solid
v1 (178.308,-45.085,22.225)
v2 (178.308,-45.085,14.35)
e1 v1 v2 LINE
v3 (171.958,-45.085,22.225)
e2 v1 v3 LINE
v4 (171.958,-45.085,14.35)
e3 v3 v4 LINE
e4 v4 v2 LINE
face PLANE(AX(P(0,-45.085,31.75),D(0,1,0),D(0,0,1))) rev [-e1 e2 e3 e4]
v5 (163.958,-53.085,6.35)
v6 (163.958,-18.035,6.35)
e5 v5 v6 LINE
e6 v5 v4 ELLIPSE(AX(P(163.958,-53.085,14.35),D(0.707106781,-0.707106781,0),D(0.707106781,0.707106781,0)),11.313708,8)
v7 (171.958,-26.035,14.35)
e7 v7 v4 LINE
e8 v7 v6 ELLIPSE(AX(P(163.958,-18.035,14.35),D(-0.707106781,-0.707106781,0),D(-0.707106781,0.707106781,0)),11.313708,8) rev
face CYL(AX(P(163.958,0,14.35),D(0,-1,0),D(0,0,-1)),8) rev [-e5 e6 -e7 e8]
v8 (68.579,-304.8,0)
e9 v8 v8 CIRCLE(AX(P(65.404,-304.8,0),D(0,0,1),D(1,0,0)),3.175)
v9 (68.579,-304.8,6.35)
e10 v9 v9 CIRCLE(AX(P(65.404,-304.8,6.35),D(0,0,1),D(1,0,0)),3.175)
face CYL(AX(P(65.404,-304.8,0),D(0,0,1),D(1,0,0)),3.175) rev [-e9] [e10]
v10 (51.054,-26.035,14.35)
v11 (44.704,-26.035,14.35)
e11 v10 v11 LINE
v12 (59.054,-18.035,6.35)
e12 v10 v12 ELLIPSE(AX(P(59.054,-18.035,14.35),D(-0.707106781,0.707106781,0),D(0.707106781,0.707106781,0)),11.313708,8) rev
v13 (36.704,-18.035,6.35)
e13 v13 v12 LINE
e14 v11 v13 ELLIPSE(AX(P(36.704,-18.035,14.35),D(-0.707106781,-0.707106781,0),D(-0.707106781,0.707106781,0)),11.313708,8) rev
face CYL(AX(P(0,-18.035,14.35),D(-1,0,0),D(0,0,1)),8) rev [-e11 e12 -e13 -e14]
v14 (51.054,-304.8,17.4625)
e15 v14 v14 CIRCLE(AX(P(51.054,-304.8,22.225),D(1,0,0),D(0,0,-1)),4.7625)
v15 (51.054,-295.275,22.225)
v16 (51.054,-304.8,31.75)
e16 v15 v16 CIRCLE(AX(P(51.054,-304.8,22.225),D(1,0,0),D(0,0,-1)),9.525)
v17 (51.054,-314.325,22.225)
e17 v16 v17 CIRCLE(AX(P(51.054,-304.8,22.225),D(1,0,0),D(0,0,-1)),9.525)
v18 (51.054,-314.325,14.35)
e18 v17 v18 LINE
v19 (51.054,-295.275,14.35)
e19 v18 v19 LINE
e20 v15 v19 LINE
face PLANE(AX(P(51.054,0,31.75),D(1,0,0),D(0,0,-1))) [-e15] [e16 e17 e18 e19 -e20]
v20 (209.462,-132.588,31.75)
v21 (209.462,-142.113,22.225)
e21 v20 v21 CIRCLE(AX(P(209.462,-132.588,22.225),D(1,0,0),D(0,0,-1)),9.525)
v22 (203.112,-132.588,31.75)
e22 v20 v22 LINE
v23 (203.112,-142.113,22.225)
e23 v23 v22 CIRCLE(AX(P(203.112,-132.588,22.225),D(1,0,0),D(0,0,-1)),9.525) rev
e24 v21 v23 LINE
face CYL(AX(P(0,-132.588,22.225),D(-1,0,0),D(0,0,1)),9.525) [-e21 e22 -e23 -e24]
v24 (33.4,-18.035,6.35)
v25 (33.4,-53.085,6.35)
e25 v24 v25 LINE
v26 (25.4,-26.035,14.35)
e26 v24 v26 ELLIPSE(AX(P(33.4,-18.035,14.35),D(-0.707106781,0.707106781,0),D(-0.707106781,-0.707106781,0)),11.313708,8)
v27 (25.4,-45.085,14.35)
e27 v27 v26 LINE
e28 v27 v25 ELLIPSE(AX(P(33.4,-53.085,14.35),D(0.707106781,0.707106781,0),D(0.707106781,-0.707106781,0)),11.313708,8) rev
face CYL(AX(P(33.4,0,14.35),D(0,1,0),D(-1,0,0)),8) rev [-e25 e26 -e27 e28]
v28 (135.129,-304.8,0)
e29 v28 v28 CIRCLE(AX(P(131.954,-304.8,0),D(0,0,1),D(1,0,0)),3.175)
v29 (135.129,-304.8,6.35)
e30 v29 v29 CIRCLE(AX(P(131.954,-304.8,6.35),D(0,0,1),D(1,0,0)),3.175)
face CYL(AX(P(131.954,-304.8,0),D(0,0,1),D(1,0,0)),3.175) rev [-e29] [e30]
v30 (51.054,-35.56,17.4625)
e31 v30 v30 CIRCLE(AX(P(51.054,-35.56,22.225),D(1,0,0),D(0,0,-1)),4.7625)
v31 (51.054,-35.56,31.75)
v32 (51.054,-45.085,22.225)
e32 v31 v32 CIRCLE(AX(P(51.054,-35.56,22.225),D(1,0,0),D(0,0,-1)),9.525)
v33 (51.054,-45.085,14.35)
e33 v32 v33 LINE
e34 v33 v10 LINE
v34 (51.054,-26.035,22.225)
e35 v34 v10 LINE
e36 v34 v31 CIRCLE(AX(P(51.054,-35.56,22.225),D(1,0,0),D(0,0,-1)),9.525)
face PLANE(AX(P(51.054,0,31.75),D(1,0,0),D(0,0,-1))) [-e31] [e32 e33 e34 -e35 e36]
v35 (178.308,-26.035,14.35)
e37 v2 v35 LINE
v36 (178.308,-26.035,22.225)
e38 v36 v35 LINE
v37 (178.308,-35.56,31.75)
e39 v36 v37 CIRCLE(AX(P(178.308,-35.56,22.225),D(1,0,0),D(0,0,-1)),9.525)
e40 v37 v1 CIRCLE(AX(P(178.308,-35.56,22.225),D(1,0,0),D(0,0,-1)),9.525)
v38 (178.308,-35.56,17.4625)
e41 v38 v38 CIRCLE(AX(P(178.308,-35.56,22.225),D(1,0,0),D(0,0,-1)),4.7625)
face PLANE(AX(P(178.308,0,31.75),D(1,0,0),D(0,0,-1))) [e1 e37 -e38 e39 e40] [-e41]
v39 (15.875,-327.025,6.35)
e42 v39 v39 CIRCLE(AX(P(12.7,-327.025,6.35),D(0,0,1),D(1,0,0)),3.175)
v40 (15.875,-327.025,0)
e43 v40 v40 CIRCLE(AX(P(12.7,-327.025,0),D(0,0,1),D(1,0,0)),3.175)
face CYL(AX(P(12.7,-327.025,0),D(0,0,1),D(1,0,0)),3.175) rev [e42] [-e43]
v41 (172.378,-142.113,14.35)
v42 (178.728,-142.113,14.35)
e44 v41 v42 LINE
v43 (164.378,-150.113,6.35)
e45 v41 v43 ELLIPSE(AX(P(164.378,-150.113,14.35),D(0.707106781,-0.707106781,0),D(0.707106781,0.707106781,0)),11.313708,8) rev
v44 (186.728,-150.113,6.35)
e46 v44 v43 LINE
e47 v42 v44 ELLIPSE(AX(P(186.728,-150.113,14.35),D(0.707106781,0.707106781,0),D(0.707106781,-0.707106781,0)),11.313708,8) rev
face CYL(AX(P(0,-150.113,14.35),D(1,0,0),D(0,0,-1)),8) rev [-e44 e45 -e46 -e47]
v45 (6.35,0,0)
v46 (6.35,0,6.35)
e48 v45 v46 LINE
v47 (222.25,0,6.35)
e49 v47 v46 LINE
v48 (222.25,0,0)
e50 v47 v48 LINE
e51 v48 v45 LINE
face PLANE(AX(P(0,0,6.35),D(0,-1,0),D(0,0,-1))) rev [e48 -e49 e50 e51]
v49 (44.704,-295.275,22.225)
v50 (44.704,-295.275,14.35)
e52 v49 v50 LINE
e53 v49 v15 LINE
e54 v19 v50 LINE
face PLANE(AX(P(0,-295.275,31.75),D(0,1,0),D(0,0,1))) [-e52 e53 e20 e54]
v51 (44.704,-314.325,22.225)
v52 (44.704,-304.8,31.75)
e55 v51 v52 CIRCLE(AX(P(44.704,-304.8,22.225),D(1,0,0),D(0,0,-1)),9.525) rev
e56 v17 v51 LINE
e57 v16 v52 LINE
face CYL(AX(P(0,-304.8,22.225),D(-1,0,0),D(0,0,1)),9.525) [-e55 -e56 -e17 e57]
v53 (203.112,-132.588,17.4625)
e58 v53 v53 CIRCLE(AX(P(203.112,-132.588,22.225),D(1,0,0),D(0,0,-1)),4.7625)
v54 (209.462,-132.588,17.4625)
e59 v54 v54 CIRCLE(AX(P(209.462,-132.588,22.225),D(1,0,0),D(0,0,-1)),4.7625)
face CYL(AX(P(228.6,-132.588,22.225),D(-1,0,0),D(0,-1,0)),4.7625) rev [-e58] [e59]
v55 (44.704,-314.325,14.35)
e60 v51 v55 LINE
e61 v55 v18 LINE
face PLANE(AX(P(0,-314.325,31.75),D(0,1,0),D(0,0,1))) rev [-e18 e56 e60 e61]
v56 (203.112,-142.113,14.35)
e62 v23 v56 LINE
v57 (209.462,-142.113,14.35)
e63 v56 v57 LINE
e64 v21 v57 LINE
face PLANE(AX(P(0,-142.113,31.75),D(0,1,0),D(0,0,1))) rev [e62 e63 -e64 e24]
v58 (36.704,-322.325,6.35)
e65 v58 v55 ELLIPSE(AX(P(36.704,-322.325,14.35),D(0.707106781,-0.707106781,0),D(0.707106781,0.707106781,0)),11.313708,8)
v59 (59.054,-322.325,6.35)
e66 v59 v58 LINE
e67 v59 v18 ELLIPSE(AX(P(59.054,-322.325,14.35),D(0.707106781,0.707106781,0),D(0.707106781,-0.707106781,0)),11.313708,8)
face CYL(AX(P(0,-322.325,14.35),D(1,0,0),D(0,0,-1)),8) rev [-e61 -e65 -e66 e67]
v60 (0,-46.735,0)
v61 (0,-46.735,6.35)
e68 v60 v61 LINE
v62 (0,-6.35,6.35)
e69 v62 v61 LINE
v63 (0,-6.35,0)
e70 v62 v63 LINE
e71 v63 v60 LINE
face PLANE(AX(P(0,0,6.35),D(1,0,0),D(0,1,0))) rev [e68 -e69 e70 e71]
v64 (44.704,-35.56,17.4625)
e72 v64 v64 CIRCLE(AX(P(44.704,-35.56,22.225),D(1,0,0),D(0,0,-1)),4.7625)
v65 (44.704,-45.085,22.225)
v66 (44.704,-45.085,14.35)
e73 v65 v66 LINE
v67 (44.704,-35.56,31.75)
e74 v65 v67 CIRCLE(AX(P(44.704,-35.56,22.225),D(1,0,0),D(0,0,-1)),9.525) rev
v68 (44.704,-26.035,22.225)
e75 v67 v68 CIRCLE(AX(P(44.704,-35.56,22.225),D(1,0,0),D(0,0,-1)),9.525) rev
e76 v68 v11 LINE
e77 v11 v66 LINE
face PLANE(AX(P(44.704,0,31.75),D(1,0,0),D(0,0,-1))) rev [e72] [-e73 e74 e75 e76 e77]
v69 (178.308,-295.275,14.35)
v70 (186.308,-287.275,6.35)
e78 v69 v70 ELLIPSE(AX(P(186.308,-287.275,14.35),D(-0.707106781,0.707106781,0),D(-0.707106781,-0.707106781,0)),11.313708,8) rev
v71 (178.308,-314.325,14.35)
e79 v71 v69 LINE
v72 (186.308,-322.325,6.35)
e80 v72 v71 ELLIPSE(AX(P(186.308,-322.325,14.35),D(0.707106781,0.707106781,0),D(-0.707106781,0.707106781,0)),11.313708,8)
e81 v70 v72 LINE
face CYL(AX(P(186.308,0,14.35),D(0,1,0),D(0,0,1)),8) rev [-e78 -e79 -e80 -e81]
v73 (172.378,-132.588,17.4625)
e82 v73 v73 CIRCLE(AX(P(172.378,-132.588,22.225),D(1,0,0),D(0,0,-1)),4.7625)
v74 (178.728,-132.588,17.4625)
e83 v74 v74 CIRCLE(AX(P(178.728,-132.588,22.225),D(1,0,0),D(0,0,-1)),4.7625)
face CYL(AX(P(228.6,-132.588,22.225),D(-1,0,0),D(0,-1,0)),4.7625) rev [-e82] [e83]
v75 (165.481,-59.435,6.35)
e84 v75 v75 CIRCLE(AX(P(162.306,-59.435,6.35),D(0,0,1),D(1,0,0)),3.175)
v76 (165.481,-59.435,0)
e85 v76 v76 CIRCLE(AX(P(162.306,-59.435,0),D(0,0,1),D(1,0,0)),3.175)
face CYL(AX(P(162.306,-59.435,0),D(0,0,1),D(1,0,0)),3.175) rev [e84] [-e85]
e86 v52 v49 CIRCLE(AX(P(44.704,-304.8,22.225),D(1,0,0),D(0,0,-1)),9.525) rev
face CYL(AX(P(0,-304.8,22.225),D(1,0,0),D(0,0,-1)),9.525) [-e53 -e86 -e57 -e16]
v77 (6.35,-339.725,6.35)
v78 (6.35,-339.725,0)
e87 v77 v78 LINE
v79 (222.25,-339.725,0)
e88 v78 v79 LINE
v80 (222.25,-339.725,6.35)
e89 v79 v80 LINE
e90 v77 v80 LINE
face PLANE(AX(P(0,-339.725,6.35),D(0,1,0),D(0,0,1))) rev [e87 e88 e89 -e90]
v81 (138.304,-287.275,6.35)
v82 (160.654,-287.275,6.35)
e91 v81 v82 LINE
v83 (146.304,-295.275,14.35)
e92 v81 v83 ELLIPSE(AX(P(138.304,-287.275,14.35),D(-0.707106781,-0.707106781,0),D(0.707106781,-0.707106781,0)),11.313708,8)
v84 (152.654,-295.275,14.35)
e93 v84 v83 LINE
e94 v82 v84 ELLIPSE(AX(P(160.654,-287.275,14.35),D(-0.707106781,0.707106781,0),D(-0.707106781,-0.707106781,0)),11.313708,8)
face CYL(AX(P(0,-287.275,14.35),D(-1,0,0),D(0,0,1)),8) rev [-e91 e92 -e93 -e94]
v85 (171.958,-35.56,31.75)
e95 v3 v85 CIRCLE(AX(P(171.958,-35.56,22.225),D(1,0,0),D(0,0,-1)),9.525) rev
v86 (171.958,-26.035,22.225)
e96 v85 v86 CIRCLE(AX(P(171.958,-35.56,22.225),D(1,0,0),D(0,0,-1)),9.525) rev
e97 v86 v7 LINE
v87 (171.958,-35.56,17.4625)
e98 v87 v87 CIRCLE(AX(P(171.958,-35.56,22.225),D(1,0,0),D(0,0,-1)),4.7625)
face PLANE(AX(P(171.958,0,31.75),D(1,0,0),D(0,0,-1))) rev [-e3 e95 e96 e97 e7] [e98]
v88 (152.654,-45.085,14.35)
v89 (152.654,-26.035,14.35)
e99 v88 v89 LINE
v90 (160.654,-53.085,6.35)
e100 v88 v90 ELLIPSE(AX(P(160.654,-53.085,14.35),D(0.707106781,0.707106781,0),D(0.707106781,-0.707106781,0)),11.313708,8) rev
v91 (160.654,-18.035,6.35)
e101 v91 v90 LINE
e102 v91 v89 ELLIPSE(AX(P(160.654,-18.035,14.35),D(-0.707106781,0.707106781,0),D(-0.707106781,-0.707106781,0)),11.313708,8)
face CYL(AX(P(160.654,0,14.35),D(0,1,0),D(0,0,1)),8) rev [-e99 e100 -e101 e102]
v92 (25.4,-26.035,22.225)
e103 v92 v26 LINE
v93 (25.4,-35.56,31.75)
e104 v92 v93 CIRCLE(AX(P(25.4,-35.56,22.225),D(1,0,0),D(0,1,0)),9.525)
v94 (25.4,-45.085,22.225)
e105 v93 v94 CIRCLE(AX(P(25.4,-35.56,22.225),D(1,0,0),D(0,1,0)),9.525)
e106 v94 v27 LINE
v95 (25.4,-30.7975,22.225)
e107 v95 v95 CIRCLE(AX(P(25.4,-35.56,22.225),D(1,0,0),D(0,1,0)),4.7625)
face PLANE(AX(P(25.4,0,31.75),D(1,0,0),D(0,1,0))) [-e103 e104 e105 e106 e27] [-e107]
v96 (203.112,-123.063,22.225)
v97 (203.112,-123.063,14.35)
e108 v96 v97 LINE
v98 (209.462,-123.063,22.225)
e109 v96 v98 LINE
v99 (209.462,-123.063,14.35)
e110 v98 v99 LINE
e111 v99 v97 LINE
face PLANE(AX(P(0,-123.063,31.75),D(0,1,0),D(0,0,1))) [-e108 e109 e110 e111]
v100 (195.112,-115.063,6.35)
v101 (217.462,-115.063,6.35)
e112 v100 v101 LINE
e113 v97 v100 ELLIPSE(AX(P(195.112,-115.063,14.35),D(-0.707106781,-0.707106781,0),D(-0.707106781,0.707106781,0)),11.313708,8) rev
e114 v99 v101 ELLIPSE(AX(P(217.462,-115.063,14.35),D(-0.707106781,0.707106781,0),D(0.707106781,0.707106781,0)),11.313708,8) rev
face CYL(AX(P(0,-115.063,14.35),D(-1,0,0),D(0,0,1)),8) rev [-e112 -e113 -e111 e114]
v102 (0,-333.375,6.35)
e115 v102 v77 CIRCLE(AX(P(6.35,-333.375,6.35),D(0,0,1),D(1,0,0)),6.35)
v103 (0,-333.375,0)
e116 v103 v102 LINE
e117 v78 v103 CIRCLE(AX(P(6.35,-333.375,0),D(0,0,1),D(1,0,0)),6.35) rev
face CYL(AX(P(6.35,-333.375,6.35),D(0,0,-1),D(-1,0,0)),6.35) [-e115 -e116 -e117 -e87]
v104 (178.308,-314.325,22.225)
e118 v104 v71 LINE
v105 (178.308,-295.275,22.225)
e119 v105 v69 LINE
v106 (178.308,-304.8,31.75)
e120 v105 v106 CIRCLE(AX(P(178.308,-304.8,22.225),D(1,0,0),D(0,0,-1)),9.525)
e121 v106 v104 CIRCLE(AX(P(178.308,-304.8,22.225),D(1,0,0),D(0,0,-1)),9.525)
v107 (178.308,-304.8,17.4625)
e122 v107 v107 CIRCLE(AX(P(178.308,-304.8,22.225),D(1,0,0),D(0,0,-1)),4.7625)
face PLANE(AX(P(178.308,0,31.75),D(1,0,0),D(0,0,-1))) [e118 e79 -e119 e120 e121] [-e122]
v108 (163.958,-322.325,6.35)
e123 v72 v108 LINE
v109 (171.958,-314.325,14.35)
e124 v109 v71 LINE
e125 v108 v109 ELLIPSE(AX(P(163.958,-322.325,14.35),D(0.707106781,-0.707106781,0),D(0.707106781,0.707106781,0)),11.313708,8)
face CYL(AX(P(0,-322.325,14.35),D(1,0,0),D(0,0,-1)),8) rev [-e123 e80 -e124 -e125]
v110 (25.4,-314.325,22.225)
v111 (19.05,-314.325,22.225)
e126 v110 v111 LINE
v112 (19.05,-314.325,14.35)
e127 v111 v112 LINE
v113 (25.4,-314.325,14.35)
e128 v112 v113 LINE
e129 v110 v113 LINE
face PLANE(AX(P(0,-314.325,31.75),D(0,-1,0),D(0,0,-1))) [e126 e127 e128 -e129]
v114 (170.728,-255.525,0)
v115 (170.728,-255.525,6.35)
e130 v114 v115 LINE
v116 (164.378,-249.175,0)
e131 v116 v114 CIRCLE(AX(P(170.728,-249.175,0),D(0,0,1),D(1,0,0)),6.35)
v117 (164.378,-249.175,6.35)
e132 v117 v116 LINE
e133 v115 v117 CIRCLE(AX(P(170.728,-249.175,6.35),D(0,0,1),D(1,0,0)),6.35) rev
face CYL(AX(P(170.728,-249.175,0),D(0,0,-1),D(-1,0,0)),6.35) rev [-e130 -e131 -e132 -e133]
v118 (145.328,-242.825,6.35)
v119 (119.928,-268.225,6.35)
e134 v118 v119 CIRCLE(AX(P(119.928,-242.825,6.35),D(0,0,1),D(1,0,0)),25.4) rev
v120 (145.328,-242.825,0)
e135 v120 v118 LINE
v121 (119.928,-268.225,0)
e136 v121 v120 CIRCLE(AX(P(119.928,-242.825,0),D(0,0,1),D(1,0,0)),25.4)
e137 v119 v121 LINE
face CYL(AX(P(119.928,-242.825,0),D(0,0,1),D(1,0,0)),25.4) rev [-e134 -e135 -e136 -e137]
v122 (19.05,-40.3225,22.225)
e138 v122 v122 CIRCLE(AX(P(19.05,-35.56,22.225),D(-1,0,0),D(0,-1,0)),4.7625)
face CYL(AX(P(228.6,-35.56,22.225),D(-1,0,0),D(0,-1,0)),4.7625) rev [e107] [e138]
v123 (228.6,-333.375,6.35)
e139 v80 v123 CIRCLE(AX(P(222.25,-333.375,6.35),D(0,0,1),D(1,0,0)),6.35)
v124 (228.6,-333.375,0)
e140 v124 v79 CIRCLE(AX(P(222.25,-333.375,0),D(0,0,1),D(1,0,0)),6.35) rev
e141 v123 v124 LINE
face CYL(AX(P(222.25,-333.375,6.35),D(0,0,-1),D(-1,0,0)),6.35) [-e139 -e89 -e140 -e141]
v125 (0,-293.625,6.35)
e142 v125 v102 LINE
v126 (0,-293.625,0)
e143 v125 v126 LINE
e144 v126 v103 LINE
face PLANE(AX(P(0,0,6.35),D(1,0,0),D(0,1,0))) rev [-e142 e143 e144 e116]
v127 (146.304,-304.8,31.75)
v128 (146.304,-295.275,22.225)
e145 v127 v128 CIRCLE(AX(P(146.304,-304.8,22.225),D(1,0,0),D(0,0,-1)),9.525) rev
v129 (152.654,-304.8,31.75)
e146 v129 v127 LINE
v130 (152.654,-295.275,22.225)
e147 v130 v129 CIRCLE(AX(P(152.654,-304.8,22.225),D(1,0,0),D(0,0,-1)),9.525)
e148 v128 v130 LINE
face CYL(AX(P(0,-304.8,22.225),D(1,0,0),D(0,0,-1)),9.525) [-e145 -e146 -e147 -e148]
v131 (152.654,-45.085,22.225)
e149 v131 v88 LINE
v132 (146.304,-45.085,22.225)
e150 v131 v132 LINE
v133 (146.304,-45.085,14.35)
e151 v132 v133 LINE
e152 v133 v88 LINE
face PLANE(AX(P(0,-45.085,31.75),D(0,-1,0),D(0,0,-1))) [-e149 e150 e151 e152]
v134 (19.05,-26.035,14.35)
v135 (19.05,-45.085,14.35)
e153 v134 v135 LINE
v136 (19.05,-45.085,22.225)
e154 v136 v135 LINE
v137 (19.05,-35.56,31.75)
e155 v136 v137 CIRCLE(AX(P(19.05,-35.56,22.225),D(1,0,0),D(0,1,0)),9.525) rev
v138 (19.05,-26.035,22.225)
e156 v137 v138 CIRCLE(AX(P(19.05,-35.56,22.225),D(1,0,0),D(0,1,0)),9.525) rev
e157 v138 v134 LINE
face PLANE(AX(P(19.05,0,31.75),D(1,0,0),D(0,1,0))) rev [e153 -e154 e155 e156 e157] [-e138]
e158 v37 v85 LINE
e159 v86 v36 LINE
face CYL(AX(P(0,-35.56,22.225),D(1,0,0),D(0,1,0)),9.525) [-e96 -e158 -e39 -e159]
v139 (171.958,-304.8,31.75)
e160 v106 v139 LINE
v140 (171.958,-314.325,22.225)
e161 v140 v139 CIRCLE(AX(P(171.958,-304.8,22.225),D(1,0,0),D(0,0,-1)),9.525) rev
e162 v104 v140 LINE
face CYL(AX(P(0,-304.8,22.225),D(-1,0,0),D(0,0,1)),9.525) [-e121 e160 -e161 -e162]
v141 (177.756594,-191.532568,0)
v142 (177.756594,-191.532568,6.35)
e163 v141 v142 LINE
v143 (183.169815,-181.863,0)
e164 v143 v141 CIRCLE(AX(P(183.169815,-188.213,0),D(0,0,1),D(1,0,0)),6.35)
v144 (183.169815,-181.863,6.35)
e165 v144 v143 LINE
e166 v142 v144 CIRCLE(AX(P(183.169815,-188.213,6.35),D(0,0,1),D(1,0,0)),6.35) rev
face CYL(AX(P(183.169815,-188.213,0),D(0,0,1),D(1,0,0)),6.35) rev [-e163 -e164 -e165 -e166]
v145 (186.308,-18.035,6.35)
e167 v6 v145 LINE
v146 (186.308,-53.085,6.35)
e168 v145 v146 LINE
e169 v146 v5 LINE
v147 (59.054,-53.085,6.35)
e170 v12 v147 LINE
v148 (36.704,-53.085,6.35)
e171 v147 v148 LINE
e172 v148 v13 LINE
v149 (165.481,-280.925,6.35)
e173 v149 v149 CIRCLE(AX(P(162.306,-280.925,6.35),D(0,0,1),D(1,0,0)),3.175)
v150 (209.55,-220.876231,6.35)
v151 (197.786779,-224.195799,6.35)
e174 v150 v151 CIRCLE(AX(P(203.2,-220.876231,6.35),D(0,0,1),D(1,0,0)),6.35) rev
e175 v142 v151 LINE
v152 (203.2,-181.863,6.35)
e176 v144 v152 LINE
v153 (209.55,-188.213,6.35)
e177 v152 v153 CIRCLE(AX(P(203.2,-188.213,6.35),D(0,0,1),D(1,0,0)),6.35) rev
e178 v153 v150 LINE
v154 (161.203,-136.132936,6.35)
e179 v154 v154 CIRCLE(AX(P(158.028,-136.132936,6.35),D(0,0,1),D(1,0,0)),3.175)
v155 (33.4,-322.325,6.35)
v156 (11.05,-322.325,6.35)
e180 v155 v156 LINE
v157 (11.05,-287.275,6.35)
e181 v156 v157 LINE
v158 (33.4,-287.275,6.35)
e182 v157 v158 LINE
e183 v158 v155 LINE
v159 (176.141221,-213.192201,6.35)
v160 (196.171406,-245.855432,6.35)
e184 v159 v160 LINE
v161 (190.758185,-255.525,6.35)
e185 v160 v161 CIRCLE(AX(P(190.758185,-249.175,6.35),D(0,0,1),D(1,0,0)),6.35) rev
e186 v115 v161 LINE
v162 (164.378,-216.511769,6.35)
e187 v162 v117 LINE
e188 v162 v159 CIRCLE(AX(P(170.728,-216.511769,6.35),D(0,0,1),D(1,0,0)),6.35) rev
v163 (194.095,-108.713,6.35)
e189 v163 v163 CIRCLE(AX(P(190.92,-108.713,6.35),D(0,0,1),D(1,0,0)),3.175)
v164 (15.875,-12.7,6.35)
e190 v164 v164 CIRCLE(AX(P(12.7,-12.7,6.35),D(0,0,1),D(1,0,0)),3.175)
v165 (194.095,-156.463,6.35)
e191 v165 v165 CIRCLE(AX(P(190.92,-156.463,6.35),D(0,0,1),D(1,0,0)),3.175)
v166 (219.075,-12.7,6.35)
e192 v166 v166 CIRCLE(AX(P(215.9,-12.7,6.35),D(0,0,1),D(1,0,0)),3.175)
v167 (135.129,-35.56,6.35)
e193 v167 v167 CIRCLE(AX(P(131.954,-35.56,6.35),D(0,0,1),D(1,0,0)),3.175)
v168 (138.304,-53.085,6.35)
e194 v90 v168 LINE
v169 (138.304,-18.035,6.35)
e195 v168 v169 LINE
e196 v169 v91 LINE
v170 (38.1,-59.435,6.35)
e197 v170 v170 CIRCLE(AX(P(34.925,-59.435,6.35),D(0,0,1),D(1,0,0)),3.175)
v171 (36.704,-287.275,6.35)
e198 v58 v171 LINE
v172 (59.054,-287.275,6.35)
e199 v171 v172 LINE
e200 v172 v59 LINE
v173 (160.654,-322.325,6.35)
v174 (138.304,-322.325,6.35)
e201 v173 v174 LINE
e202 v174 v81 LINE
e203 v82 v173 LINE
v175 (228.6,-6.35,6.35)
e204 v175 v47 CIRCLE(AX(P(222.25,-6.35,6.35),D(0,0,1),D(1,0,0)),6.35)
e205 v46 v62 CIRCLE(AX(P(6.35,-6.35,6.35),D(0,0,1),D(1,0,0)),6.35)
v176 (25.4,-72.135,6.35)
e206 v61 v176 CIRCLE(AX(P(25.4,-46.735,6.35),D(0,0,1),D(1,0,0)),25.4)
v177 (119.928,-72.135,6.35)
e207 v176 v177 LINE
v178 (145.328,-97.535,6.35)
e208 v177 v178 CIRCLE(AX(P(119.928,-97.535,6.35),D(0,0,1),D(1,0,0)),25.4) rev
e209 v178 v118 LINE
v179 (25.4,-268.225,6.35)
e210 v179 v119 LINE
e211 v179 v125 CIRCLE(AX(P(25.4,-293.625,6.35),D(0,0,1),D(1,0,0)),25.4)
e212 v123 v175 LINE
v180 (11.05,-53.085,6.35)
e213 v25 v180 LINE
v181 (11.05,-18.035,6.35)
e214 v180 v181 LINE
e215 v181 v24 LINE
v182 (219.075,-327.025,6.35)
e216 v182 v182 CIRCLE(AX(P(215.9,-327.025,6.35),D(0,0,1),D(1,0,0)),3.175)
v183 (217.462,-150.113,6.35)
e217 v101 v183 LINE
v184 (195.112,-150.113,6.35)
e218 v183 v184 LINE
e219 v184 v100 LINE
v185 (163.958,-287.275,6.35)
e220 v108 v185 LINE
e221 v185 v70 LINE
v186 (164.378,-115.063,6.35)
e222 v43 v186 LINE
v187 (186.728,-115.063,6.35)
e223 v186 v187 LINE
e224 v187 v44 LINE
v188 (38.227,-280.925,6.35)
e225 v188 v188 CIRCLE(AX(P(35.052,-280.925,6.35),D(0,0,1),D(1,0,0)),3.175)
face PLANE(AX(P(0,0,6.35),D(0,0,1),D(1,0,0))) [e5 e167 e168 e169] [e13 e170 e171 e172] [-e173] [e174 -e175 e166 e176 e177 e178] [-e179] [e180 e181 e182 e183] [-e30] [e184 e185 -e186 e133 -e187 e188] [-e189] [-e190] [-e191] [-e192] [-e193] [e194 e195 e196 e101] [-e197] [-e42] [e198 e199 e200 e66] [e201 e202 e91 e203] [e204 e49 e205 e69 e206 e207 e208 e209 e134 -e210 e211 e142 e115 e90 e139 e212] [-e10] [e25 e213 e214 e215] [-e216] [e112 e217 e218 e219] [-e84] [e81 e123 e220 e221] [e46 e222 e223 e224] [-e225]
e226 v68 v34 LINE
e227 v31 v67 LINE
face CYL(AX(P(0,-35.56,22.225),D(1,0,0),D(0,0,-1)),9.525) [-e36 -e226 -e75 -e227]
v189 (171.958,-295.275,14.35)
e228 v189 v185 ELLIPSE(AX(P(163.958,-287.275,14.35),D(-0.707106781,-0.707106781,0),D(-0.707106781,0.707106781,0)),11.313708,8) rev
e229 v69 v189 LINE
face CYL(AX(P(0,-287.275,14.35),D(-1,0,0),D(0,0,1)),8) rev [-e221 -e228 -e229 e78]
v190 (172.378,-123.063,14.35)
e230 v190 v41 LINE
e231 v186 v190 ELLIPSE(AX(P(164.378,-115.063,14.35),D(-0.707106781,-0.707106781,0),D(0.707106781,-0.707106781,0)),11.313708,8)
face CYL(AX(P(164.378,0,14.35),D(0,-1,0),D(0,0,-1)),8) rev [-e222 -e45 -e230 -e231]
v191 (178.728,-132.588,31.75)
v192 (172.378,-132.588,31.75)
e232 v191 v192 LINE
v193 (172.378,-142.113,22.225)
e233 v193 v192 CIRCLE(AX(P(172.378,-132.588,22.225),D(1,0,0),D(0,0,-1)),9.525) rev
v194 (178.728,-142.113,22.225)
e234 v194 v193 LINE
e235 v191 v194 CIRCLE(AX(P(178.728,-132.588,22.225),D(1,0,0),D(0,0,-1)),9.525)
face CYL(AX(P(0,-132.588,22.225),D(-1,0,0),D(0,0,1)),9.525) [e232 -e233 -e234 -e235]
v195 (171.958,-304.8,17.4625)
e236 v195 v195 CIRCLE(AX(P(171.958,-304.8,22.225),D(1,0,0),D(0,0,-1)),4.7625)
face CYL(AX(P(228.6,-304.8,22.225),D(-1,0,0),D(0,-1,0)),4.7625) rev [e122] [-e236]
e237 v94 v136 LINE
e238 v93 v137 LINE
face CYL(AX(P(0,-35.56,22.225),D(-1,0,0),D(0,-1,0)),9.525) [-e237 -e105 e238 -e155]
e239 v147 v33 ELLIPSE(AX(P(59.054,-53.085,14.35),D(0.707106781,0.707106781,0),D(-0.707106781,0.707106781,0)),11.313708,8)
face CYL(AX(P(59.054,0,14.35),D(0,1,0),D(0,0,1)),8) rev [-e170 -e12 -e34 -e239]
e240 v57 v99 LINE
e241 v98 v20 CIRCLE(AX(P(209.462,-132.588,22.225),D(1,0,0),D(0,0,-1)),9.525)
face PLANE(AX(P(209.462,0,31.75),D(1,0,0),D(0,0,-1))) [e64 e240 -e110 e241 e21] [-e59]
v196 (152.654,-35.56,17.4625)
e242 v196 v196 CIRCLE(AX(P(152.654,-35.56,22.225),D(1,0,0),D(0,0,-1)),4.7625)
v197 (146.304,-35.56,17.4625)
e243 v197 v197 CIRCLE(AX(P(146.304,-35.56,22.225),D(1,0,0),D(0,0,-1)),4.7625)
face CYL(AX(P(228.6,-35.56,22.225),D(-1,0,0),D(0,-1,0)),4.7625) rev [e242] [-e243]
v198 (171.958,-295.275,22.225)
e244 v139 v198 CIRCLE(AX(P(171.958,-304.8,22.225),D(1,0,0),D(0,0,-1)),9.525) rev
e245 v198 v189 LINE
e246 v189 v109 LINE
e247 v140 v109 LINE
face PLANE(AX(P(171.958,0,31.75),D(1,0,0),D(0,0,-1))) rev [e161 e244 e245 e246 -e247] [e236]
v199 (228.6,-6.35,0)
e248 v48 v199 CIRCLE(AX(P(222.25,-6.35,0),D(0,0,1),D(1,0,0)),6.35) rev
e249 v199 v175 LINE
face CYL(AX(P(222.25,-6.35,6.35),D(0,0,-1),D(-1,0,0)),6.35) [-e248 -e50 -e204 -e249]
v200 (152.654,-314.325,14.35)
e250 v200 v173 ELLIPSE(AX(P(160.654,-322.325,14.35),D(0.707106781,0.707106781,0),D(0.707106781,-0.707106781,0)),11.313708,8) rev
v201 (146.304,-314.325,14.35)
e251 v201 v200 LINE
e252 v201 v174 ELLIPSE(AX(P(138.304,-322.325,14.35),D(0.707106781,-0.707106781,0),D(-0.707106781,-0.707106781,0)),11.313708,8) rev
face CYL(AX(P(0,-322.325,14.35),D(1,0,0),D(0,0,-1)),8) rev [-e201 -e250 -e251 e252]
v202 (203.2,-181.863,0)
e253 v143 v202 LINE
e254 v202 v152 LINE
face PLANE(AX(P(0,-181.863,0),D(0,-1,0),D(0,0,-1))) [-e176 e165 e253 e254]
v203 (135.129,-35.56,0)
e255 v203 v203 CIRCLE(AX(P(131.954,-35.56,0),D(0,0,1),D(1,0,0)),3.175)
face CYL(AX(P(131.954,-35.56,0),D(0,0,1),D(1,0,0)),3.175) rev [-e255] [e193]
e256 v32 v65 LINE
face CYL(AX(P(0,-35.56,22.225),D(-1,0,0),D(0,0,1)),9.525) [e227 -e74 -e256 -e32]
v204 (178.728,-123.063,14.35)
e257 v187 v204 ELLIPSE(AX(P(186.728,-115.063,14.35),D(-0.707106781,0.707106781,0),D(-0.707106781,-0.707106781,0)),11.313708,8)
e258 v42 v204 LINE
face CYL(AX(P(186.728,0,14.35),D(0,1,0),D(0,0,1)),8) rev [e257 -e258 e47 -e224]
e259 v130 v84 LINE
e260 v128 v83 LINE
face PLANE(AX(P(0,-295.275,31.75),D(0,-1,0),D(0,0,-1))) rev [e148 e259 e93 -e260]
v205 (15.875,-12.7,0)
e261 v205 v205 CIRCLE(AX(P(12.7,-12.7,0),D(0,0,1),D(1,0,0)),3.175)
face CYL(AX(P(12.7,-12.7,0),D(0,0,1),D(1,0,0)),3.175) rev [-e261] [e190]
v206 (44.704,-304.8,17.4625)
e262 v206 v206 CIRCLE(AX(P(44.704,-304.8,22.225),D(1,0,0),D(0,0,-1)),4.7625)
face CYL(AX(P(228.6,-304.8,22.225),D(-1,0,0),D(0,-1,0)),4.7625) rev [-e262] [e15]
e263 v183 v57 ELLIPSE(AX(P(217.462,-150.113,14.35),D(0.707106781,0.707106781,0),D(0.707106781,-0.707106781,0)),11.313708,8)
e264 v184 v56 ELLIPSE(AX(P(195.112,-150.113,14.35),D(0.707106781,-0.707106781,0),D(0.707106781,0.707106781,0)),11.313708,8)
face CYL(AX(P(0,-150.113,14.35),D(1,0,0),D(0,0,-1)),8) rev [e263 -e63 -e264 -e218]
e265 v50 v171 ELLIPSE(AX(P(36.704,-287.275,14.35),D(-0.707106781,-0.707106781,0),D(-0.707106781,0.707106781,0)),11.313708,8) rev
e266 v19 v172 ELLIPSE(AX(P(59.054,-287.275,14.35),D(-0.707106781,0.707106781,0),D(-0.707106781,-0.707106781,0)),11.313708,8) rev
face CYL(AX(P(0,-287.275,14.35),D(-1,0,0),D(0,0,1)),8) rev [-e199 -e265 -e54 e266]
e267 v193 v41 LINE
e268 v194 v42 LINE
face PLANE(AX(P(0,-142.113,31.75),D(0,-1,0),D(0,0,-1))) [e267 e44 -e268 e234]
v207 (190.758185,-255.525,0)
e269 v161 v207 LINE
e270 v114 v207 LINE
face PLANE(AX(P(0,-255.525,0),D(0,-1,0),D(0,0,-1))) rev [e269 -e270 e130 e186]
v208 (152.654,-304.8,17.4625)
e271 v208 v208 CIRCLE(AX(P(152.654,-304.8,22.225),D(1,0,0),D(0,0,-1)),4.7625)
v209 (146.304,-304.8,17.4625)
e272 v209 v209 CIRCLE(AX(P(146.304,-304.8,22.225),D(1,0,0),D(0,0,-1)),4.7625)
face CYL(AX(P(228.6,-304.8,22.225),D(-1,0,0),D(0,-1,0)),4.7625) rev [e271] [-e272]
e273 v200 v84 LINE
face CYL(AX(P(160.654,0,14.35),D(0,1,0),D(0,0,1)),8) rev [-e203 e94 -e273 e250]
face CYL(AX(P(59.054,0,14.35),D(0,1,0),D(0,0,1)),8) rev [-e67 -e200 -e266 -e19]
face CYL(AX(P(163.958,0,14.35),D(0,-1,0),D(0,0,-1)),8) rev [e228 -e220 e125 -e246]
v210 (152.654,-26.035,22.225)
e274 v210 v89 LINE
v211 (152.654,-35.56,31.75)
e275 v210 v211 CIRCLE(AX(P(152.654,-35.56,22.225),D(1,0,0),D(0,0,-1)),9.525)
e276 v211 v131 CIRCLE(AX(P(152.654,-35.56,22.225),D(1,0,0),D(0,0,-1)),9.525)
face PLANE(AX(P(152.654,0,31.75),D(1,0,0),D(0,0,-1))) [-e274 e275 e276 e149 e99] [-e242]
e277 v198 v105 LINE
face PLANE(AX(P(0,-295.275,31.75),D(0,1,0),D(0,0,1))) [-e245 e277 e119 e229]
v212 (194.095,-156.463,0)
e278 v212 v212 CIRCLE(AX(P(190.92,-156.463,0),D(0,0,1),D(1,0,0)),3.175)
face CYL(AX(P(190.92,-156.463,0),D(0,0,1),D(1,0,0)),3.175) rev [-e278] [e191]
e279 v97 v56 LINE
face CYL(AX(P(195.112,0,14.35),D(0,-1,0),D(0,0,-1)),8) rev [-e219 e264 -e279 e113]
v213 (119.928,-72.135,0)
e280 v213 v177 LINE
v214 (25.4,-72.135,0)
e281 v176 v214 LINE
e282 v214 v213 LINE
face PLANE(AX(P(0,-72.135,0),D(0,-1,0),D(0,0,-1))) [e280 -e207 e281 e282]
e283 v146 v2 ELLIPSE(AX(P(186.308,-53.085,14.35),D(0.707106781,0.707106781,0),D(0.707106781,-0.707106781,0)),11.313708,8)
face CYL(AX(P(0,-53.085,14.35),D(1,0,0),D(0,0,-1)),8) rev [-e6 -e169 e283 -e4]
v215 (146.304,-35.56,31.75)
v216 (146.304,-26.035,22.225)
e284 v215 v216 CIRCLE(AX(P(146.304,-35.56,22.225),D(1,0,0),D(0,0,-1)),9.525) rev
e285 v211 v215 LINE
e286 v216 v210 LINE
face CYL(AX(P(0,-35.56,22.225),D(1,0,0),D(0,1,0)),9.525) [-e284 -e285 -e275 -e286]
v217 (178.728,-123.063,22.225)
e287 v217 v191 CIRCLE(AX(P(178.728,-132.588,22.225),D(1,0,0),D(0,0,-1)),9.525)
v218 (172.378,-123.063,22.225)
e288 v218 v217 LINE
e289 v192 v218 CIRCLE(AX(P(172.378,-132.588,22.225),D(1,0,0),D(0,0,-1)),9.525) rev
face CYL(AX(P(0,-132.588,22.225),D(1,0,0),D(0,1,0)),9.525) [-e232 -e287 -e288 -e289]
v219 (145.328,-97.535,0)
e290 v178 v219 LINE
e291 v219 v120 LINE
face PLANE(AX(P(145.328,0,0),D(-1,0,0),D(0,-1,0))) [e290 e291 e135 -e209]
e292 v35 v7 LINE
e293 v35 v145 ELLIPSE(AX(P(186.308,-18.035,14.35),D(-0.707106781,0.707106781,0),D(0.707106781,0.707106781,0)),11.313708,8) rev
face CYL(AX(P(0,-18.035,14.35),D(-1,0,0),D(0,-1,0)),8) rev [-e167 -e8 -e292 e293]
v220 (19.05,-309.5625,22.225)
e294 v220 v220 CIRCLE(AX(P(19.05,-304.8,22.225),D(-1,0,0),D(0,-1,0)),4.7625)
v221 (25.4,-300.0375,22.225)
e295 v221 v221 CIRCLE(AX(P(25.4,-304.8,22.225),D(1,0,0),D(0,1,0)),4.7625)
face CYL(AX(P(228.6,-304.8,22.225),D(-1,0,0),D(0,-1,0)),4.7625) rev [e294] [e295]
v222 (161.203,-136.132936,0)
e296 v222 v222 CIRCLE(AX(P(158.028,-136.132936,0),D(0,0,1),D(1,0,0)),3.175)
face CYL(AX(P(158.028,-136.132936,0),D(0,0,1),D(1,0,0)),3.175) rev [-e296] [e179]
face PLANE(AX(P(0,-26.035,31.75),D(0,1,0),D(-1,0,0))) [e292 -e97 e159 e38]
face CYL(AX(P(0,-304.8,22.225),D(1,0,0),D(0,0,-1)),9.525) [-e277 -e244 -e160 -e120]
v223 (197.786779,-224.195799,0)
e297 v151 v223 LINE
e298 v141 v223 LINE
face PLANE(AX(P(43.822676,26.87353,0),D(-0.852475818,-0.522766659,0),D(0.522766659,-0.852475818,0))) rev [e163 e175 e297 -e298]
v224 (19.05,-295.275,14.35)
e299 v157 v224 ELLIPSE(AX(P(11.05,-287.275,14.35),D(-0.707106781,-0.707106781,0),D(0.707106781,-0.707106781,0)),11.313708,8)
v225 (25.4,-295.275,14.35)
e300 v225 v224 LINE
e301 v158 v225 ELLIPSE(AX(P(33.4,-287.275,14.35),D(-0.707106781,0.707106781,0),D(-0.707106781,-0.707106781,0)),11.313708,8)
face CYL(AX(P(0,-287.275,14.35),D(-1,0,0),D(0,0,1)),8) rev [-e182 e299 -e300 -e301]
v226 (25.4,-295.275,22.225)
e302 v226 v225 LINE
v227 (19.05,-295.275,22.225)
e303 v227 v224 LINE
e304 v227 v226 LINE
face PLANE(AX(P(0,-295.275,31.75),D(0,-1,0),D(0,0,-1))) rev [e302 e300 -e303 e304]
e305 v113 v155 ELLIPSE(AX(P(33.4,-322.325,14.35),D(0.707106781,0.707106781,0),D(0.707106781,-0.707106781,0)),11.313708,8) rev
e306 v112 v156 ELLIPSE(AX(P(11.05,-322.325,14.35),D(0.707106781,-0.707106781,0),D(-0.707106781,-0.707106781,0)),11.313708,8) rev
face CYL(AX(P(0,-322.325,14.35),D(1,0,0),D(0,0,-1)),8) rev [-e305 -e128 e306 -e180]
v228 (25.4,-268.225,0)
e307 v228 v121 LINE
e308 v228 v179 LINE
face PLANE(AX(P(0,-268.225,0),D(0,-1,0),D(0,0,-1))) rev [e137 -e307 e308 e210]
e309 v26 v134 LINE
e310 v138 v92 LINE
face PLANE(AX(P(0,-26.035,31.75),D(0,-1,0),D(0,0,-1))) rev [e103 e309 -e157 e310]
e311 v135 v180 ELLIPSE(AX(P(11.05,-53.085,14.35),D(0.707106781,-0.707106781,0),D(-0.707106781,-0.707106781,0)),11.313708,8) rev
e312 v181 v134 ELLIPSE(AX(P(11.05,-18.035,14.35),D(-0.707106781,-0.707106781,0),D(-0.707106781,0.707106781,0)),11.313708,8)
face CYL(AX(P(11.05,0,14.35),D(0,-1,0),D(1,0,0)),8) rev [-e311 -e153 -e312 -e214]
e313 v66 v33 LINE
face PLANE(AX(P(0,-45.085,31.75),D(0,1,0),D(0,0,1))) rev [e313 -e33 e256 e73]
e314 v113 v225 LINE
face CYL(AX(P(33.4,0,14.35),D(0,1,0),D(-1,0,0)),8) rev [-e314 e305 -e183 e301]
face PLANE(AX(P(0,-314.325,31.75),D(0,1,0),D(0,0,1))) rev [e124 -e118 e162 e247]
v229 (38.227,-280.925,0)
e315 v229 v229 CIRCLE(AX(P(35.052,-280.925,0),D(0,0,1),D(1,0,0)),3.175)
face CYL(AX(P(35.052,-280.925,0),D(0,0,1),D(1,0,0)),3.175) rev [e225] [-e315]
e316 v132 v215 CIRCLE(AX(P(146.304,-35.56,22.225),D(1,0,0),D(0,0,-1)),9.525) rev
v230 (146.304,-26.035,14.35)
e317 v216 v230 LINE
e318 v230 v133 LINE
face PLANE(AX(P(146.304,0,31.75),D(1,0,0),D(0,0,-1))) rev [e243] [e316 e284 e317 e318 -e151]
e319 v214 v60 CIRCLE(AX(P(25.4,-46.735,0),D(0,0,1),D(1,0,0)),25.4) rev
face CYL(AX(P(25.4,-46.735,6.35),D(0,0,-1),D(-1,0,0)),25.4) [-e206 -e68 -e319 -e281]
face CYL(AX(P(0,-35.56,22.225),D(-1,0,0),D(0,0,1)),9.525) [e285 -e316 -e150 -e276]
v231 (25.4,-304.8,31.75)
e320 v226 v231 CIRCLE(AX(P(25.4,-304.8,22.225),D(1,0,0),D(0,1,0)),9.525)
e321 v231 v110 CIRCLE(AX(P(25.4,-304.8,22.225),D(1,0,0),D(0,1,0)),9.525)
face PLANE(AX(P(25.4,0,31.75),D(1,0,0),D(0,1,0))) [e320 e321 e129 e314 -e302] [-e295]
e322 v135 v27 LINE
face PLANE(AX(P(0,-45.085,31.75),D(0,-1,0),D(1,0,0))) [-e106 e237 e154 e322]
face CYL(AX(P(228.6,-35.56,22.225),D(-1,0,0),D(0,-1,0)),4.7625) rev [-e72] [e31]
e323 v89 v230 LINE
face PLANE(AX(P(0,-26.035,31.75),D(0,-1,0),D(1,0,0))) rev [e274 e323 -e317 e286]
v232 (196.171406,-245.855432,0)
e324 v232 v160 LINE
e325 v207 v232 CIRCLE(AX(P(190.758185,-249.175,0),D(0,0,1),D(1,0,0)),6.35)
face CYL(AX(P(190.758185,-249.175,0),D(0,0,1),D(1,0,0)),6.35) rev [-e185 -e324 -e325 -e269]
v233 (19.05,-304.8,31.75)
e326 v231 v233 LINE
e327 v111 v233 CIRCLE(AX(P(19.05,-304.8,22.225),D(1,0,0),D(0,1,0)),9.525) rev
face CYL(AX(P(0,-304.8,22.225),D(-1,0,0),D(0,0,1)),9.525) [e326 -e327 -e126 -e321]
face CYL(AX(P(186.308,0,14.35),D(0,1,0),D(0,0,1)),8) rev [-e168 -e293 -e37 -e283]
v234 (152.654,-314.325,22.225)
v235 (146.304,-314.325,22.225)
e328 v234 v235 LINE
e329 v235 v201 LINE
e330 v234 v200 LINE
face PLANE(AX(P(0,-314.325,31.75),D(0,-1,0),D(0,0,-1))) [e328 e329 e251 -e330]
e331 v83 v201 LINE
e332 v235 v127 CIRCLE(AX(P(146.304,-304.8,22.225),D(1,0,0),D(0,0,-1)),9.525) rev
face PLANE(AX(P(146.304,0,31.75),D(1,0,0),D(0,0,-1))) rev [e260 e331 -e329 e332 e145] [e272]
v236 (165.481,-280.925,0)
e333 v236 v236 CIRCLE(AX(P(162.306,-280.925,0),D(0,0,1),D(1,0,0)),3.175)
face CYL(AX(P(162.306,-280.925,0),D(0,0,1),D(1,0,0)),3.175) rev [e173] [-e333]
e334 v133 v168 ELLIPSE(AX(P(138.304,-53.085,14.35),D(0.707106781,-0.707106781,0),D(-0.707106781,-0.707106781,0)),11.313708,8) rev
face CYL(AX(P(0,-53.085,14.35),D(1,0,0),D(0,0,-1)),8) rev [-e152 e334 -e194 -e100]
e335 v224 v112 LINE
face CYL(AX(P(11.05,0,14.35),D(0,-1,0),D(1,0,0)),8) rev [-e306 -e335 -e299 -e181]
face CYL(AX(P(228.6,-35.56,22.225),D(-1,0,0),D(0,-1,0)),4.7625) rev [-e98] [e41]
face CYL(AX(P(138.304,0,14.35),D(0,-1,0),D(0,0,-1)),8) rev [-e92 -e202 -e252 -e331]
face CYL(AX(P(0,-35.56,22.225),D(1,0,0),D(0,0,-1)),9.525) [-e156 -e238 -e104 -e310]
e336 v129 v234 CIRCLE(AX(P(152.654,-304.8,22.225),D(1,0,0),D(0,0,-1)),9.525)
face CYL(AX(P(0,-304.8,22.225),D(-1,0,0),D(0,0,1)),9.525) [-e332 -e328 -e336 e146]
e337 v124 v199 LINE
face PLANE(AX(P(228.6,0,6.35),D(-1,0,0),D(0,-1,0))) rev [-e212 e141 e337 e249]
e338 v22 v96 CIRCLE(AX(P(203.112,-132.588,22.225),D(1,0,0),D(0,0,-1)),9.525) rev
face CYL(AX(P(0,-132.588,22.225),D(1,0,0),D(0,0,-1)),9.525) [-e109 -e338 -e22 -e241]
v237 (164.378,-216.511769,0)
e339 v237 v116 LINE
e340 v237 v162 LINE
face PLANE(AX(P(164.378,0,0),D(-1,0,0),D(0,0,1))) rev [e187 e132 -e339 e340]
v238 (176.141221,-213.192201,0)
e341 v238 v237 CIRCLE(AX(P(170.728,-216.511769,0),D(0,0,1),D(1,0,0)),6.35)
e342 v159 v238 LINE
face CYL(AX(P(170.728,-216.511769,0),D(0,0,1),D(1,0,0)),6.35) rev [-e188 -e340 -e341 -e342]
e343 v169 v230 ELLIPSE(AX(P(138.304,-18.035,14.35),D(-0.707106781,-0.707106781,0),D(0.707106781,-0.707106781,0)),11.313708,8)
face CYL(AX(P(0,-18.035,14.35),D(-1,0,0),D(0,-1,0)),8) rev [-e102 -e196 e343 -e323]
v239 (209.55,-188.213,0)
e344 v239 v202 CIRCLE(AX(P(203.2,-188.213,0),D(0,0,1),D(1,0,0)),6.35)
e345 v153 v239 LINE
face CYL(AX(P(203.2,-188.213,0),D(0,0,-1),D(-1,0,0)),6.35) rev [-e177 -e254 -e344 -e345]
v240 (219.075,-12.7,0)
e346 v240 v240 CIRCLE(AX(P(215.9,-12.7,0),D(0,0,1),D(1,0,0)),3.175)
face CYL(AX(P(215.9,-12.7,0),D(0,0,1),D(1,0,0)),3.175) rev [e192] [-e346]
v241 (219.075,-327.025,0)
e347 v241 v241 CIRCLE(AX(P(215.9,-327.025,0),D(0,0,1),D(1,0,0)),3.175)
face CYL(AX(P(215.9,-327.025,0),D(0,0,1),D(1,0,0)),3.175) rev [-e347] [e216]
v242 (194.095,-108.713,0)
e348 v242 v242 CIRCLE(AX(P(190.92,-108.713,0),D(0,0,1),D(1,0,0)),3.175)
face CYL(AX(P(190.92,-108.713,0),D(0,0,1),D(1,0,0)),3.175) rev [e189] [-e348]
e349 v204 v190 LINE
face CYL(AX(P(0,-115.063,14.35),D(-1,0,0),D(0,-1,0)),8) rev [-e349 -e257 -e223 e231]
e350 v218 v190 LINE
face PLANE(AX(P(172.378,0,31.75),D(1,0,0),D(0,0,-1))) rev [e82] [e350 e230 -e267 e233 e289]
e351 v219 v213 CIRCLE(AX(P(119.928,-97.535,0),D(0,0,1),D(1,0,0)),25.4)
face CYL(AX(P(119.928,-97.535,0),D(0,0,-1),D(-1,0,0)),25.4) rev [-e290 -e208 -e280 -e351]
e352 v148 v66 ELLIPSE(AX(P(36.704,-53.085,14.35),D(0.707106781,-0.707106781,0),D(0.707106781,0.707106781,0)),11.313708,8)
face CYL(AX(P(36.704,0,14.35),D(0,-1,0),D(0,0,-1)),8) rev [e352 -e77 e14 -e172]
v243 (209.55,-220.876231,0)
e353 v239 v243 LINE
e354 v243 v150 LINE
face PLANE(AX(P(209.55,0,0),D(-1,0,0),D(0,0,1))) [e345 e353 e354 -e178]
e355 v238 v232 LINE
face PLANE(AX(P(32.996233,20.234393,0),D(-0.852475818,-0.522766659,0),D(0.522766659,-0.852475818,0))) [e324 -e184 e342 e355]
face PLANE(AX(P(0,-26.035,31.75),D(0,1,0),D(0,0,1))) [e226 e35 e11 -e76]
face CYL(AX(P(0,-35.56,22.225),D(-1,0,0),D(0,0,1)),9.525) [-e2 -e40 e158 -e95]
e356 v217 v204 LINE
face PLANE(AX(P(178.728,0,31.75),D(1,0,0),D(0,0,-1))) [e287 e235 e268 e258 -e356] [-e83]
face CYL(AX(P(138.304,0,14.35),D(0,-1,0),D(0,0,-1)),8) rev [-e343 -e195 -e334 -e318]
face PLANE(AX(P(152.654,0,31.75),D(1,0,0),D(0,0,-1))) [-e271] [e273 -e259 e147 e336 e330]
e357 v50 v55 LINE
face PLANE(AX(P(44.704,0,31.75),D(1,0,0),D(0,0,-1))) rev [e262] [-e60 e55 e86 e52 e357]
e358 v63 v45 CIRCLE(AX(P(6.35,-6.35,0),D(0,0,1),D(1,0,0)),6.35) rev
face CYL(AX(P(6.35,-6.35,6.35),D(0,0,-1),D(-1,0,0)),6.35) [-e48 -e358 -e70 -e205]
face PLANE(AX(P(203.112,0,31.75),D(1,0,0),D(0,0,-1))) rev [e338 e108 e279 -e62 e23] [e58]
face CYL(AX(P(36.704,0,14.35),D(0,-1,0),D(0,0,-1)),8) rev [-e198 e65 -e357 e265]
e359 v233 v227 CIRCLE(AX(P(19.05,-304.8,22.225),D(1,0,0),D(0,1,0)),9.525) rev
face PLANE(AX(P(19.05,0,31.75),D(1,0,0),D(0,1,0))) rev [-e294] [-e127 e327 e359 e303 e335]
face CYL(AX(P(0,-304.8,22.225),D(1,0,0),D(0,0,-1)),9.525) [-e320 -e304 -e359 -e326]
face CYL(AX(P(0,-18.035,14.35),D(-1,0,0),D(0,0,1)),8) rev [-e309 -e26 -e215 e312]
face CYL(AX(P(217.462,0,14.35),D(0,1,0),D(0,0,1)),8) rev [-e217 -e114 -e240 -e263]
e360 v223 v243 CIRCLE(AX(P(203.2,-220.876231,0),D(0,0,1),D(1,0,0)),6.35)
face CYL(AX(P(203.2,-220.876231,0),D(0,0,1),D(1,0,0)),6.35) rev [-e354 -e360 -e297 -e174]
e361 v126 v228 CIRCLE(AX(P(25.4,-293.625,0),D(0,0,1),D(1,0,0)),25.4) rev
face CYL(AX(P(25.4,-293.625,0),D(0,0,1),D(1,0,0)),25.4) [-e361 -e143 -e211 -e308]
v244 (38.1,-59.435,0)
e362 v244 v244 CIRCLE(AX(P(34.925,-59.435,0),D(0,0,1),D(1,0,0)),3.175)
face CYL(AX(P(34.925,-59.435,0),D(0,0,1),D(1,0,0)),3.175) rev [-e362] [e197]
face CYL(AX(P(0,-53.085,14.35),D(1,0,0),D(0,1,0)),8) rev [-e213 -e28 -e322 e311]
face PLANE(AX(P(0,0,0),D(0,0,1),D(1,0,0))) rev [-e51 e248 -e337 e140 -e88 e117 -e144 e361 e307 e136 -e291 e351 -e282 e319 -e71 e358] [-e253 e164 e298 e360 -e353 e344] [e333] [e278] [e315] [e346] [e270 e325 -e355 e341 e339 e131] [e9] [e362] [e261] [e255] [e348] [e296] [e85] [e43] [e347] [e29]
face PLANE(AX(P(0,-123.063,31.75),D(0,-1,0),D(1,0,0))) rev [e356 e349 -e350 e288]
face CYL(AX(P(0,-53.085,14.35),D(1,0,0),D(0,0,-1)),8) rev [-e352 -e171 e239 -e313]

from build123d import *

# Parameters (mm, degrees)
SKETCH1_W           = 228.6
SKETCH1_H           = 339.725
BOSS_EXTRUDE1_DEPTH = 6.35
SKETCH2_W           = 6.35
SKETCH2_H           = 19.05
BOSS_EXTRUDE2_DEPTH = 25.4
FILLET1_R           = 9.525
FILLET2_R           = 8
SKETCH3_R           = 4.7625
CUT_EXTRUDE1_DEPTH  = 401.415210282
SKETCH5_R           = 3.175
CUT_EXTRUDE2_DEPTH  = 411.263568484
SKETCH9_W           = 145.328
SKETCH9_H           = 196.09
CUT_EXTRUDE3_DEPTH  = 411.263568484
FILLET3_R           = 25.4
FILLET4_R           = 6.35


with BuildPart() as part:
    # Sketch1 → Boss-Extrude1 (new body)
    with BuildSketch(Plane.XY):
        with Locations((114.3, -169.8625)):
            Rectangle(SKETCH1_W, SKETCH1_H)
    extrude(amount=BOSS_EXTRUDE1_DEPTH)

    # Sketch2 → Boss-Extrude2 (add)
    with BuildSketch(Plane.XY.offset(6.35)):
        with Locations((22.225, -35.56)):
            Rectangle(SKETCH2_W, SKETCH2_H)
        with Locations((47.879, -35.56)):
            Rectangle(SKETCH2_W, SKETCH2_H)
        with Locations((149.479, -35.56)):
            Rectangle(SKETCH2_W, SKETCH2_H)
        with Locations((175.133, -35.56)):
            Rectangle(SKETCH2_W, SKETCH2_H)
        with Locations((22.225, -304.8)):
            Rectangle(SKETCH2_W, SKETCH2_H)
        with Locations((47.879, -304.8)):
            Rectangle(SKETCH2_W, SKETCH2_H)
        with Locations((149.479, -304.8)):
            Rectangle(SKETCH2_W, SKETCH2_H)
        with Locations((175.133, -304.8)):
            Rectangle(SKETCH2_W, SKETCH2_H)
        with Locations((175.553, -132.588)):
            Rectangle(SKETCH2_W, SKETCH2_H)
        with Locations((206.287, -132.588)):
            Rectangle(SKETCH2_W, SKETCH2_H)
    extrude(amount=BOSS_EXTRUDE2_DEPTH)

    # Fillet1
    fillet1_edges = [part.edges().sort_by_distance(p)[0] for p in [
        (22.225, -314.325, 31.75),
        (22.225, -295.275, 31.75),
        (47.879, -314.325, 31.75),
        (47.879, -295.275, 31.75),
        (149.479, -314.325, 31.75),
        (149.479, -295.275, 31.75),
        (175.133, -314.325, 31.75),
        (175.133, -295.275, 31.75),
        (206.287, -142.113, 31.75),
        (206.287, -123.063, 31.75),
        (175.553, -142.113, 31.75),
        (175.553, -123.063, 31.75),
        (175.133, -45.085, 31.75),
        (175.133, -26.035, 31.75),
        (149.479, -45.085, 31.75),
        (149.479, -26.035, 31.75),
        (47.879, -45.085, 31.75),
        (47.879, -26.035, 31.75),
        (22.225, -45.085, 31.75),
        (22.225, -26.035, 31.75),
    ]]
    fillet(fillet1_edges, radius=FILLET1_R - 0.0001)  # a hair under: the kernel refuses the full size

    # Fillet2
    fillet2_edges = [part.edges().sort_by_distance(p)[0] for p in [
        (22.225, -295.275, 6.35),
        (19.05, -304.8, 6.35),
        (25.4, -304.8, 6.35),
        (22.225, -314.325, 6.35),
        (44.704, -304.8, 6.35),
        (47.879, -314.325, 6.35),
        (51.054, -304.8, 6.35),
        (47.879, -295.275, 6.35),
        (22.225, -26.035, 6.35),
        (19.05, -35.56, 6.35),
        (25.4, -35.56, 6.35),
        (22.225, -45.085, 6.35),
        (44.704, -35.56, 6.35),
        (47.879, -45.085, 6.35),
        (51.054, -35.56, 6.35),
        (47.879, -26.035, 6.35),
        (149.479, -26.035, 6.35),
        (146.304, -35.56, 6.35),
        (152.654, -35.56, 6.35),
        (149.479, -45.085, 6.35),
        (171.958, -35.56, 6.35),
        (175.133, -45.085, 6.35),
        (178.308, -35.56, 6.35),
        (175.133, -26.035, 6.35),
        (175.553, -123.063, 6.35),
        (172.378, -132.588, 6.35),
        (178.728, -132.588, 6.35),
        (175.553, -142.113, 6.35),
        (203.112, -132.588, 6.35),
        (206.287, -142.113, 6.35),
        (209.462, -132.588, 6.35),
        (206.287, -123.063, 6.35),
        (171.958, -304.8, 6.35),
        (175.133, -314.325, 6.35),
        (178.308, -304.8, 6.35),
        (175.133, -295.275, 6.35),
        (149.479, -295.275, 6.35),
        (146.304, -304.8, 6.35),
        (152.654, -304.8, 6.35),
        (149.479, -314.325, 6.35),
    ]]
    fillet(fillet2_edges, radius=FILLET2_R)

    # Sketch3 → Cut-Extrude1 (cut, through all)
    with BuildSketch(Plane.ZY.offset(-19.05)):
        with Locations(Location((22.225, -35.56, 0), (0, 0, 180))):
            Circle(SKETCH3_R)
        with Locations(Location((22.225, -132.588, 0), (0, 0, 180))):
            Circle(SKETCH3_R)
        with Locations(Location((22.225, -304.8, 0), (0, 0, 180))):
            Circle(SKETCH3_R)
    extrude(amount=-CUT_EXTRUDE1_DEPTH, mode=Mode.SUBTRACT)

    # Sketch5 → Cut-Extrude2 (cut, through all)
    with BuildSketch(Plane.XY.offset(6.35)):
        with Locations((12.7, -12.7)):
            Circle(SKETCH5_R)
        with Locations((34.925, -59.435)):
            Circle(SKETCH5_R)
        with Locations((131.954, -35.56)):
            Circle(SKETCH5_R)
        with Locations((215.9, -12.7)):
            Circle(SKETCH5_R)
        with Locations((162.306, -59.435)):
            Circle(SKETCH5_R)
        with Locations((190.92, -108.713)):
            Circle(SKETCH5_R)
        with Locations((158.028, -136.132936151)):
            Circle(SKETCH5_R)
        with Locations((190.92, -156.463)):
            Circle(SKETCH5_R)
        with Locations((215.9, -327.025)):
            Circle(SKETCH5_R)
        with Locations((162.306, -280.925)):
            Circle(SKETCH5_R)
        with Locations((131.954, -304.8)):
            Circle(SKETCH5_R)
        with Locations((65.404, -304.8)):
            Circle(SKETCH5_R)
        with Locations((35.052, -280.925)):
            Circle(SKETCH5_R)
        with Locations((12.7, -327.025)):
            Circle(SKETCH5_R)
    extrude(amount=-CUT_EXTRUDE2_DEPTH, mode=Mode.SUBTRACT)

    # Sketch9 → Cut-Extrude3 (cut, through all)
    with BuildSketch(Plane.XY.offset(6.35)):
        with Locations((72.664, -170.18)):
            Rectangle(SKETCH9_W, SKETCH9_H)
        Polygon((202.101108352, -255.525), (164.378, -194.009910842), (164.378, -255.525), align=None)
        Polygon((209.55, -181.863), (171.826891648, -181.863), (209.55, -243.378089158), align=None)
    extrude(amount=-CUT_EXTRUDE3_DEPTH, mode=Mode.SUBTRACT)

    # Fillet3
    fillet3_edges = [part.edges().sort_by_distance(p)[0] for p in [
        (145.328, -72.135, 3.175),
        (145.328, -268.225, 3.175),
        (0, -268.225, 3.175),
        (0, -72.135, 3.175),
    ]]
    fillet(fillet3_edges, radius=FILLET3_R)

    # Fillet4
    fillet4_edges = [part.edges().sort_by_distance(p)[0] for p in [
        (171.826891648, -181.863, 3.175),
        (209.55, -181.863, 3.175),
        (209.55, -243.378089158, 3.175),
        (164.378, -194.009910842, 3.175),
        (202.101108352, -255.525, 3.175),
        (164.378, -255.525, 3.175),
        (0, 0, 3.175),
        (228.6, 0, 3.175),
        (228.6, -339.725, 3.175),
        (0, -339.725, 3.175),
    ]]
    fillet(fillet4_edges, radius=FILLET4_R)


solid = part.part
